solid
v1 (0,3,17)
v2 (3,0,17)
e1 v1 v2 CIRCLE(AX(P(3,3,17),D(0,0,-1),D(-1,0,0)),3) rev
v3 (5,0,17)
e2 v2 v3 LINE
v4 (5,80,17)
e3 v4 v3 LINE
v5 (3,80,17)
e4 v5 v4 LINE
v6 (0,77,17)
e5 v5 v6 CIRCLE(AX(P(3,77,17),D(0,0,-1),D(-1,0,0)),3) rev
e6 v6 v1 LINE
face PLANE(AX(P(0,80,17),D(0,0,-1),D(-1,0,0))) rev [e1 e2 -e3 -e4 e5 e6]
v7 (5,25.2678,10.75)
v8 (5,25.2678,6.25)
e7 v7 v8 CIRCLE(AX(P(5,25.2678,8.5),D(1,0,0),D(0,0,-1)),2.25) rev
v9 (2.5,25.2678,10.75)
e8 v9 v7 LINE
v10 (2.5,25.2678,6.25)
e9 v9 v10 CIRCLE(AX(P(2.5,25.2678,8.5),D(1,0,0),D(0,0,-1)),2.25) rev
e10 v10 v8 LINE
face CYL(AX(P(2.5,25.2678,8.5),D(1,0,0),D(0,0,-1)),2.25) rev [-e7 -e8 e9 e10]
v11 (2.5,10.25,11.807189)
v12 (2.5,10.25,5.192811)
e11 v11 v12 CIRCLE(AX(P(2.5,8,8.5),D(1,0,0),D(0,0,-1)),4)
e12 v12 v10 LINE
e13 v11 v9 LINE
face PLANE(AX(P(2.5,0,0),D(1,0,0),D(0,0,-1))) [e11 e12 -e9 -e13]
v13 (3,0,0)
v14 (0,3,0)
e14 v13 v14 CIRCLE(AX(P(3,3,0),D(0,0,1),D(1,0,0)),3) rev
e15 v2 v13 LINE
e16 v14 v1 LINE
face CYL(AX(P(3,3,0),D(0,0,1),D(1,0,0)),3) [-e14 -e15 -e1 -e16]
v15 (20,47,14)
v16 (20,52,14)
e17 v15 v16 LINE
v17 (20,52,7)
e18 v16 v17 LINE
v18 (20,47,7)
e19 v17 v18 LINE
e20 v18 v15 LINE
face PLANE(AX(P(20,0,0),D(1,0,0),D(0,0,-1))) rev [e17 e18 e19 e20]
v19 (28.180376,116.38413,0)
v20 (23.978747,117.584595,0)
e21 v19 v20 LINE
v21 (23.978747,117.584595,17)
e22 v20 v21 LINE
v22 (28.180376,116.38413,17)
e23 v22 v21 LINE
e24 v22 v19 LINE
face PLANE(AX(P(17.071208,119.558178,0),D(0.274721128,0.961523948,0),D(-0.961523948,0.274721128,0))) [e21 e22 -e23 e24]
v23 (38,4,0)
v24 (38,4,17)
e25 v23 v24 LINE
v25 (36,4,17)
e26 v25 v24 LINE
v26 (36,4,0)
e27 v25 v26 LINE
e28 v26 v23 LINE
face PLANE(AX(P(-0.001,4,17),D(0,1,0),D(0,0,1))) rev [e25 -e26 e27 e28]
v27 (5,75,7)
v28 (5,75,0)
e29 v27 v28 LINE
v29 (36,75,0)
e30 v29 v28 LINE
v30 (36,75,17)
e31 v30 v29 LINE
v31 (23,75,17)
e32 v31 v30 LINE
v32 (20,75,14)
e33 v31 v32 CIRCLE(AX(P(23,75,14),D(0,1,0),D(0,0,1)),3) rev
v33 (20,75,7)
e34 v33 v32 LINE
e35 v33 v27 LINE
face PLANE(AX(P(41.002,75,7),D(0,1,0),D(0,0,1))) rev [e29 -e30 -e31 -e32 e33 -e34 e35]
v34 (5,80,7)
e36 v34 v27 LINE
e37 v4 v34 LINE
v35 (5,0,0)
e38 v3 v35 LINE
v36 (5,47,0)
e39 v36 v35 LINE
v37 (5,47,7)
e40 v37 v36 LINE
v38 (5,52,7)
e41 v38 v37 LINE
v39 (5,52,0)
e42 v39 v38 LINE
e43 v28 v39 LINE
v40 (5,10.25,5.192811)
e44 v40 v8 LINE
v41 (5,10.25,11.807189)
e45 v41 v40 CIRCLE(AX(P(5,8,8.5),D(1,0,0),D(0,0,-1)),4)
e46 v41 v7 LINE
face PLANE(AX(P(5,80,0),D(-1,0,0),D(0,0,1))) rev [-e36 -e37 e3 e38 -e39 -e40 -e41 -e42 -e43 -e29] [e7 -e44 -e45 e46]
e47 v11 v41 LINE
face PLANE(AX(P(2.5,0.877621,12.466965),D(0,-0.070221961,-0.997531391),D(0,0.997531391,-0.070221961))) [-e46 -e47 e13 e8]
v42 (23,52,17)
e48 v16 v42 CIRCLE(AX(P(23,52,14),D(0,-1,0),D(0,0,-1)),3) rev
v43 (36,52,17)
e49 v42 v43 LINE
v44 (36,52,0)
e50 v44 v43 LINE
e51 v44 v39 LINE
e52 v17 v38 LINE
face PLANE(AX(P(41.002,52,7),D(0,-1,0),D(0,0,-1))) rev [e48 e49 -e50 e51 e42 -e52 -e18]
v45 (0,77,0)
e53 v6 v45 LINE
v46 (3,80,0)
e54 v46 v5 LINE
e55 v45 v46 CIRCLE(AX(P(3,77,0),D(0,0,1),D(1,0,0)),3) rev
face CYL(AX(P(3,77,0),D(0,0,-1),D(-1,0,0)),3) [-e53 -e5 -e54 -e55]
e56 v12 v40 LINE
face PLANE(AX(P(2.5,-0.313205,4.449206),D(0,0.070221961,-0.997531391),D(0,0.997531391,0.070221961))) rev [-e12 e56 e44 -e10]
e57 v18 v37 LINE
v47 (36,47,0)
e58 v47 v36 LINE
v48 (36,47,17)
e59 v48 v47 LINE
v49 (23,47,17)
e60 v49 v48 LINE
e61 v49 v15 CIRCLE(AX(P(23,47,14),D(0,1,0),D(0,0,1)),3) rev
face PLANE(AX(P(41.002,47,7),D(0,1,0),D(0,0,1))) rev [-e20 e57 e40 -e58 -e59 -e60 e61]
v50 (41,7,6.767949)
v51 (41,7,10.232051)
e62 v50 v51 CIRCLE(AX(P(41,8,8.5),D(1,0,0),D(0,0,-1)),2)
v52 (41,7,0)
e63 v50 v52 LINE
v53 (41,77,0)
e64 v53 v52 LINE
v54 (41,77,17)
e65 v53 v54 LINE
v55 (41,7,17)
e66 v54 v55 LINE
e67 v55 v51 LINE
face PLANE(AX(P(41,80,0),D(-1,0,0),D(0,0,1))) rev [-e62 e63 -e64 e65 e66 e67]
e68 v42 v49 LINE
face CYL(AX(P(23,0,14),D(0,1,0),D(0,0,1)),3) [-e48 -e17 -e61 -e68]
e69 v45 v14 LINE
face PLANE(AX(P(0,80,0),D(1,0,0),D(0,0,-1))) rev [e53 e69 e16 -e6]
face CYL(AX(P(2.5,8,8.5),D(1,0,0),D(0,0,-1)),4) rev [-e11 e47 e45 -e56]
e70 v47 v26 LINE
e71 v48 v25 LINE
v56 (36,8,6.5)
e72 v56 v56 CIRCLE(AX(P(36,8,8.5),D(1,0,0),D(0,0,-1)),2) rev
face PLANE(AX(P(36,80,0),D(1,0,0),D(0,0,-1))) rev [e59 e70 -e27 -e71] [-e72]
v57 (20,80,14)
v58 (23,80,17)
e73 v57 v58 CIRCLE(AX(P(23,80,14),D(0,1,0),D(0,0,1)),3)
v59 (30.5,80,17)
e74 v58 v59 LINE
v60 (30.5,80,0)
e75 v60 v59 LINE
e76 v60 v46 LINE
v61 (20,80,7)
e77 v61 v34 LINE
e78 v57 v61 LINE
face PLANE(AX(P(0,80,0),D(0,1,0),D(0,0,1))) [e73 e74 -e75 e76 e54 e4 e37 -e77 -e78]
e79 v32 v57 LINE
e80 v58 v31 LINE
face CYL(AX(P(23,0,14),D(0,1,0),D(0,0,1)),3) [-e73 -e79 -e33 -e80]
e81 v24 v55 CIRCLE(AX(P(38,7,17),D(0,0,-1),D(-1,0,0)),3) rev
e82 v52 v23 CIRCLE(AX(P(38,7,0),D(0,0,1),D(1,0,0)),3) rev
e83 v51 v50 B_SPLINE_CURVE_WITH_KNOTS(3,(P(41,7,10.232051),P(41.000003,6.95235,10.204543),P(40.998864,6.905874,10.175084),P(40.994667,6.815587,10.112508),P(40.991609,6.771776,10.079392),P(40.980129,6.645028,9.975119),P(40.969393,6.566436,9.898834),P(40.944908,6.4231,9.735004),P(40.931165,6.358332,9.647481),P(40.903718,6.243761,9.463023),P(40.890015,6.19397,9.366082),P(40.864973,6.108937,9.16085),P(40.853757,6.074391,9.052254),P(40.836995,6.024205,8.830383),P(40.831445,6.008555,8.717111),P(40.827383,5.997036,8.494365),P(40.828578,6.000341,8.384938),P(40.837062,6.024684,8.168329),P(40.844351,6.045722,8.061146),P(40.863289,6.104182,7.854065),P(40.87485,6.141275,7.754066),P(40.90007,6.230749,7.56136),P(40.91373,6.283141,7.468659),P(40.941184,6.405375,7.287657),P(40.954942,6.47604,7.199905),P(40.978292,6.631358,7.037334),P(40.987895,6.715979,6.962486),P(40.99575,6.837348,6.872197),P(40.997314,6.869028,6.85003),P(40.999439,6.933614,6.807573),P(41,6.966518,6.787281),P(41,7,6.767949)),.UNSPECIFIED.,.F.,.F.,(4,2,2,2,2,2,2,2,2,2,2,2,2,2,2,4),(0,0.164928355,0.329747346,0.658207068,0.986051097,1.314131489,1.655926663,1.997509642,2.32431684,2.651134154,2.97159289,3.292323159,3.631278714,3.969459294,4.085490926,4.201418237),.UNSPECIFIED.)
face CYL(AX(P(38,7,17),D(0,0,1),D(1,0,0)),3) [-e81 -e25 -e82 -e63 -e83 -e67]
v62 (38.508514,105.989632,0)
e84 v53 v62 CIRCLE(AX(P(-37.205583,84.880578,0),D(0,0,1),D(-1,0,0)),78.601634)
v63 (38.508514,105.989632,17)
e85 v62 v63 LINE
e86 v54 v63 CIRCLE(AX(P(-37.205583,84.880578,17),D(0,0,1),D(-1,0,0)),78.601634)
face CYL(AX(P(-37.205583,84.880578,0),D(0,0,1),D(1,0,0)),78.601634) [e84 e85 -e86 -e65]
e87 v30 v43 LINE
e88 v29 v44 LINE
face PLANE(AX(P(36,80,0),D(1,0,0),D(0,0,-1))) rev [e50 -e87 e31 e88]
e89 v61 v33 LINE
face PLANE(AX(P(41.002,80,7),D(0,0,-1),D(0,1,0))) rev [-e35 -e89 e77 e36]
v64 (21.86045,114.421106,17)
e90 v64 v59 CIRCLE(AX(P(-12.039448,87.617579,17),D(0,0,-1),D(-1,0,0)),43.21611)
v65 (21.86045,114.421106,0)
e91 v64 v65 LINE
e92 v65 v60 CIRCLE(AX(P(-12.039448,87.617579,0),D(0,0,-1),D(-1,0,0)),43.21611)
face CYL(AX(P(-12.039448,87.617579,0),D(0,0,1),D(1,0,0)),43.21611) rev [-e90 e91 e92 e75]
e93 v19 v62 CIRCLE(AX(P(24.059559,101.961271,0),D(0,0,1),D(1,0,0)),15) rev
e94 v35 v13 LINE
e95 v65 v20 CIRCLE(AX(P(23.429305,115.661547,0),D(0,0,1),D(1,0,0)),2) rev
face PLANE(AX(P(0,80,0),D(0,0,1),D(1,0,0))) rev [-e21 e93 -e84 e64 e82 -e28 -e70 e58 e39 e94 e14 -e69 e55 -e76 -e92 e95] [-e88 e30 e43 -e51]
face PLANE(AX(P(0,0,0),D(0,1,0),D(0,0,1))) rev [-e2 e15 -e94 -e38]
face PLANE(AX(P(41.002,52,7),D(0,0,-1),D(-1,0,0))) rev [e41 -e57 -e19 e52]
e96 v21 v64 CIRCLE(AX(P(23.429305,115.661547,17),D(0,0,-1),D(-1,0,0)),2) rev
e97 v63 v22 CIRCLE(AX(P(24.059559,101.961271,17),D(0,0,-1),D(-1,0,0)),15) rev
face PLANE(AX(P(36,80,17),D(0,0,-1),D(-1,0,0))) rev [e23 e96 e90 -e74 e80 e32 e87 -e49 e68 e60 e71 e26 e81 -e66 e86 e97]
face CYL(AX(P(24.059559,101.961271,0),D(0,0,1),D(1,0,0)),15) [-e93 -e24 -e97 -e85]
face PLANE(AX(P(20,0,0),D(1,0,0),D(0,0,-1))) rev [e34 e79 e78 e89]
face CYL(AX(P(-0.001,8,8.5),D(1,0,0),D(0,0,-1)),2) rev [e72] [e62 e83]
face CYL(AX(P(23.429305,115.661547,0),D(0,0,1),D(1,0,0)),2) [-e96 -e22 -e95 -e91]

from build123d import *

# Parameters (mm, degrees)
SKETCH1_W             = 5
SKETCH1_H             = 17
BOSS_EXTRUDE1_DEPTH   = 80
BOSS_EXTRUDE1_2_DEPTH = 80
CUT_EXTRUDE1_DEPTH    = 2.5
SKETCH7_W             = 17
SKETCH7_H             = 4
CUT_EXTRUDE4_DEPTH    = 5
SKETCH8_R             = 2
CUT_EXTRUDE5_DEPTH    = 5
BOSS_EXTRUDE3_REACH   = 91.359
SKETCH9_W             = 7
SKETCH9_H             = 5
SKETCH10_W            = 10
SKETCH10_H            = 5
BOSS_EXTRUDE4_DEPTH   = 16
FILLET3_R             = 3
BOSS_EXTRUDE5_DEPTH   = 17
FILLET4_R             = 2
FILLET5_R             = 15


with BuildPart() as part:
    # Sketch1 → Boss-Extrude1 (new body)
    with BuildSketch(Plane(origin=(0, 0, 0), x_dir=(1, 0, 0), z_dir=(0, 1, 0))):
        with Locations((2.5, -8.5)):
            Rectangle(SKETCH1_W, SKETCH1_H)
    extrude(amount=BOSS_EXTRUDE1_DEPTH)

    # Sketch2 → Cut-Extrude1 (cut)
    with BuildSketch(Plane(origin=(5, 0, 0), x_dir=(0, 0, -1), z_dir=(1, 0, 0))):
        with BuildLine():
            Line((-10.75, 25.267799715), (-11.807189139, 10.25))
            ThreePointArc((-11.807189139, 10.25), (-8.5, 12), (-5.192810861, 10.25))
            Line((-5.192810861, 10.25), (-6.25, 25.267799715))
            ThreePointArc((-6.25, 25.267799715), (-8.5, 27.517799715), (-10.75, 25.267799715))
        make_face()
        with BuildLine():
            ThreePointArc((-5.192810861, 10.25), (-8.5, 12), (-11.807189139, 10.25))
            Line((-11.807189139, 10.25), (-11.807189139, 5.75))
            ThreePointArc((-11.807189139, 5.75), (-8.5, 4), (-5.192810861, 5.75))
            Line((-5.192810861, 5.75), (-5.192810861, 10.25))
        make_face()
        with BuildLine():
            Line((-11.807189139, 5.75), (-11.807189139, 10.25))
            ThreePointArc((-11.807189139, 10.25), (-12.5, 8), (-11.807189139, 5.75))
        make_face()
        with BuildLine():
            ThreePointArc((-4.5, 8), (-4.677124344, 9.177124344), (-5.192810861, 10.25))
            Line((-5.192810861, 10.25), (-5.192810861, 5.75))
            ThreePointArc((-5.192810861, 5.75), (-4.677124344, 6.822875656), (-4.5, 8))
        make_face()
    extrude(amount=-CUT_EXTRUDE1_DEPTH, mode=Mode.SUBTRACT)


with BuildPart() as body_2:
    # Sketch1 → Boss-Extrude1 2 (new body)
    with BuildSketch(Plane(origin=(0, 0, 0), x_dir=(1, 0, 0), z_dir=(0, 1, 0))):
        with Locations((38.5, -8.5)):
            Rectangle(SKETCH1_W, SKETCH1_H)
    extrude(amount=BOSS_EXTRUDE1_2_DEPTH)

    # Sketch7 → Cut-Extrude4 (cut)
    with BuildSketch(Plane(origin=(41, 0, 0), x_dir=(0, 0, -1), z_dir=(1, 0, 0))):
        with Locations((-8.5, 2)):
            Rectangle(SKETCH7_W, SKETCH7_H)
    extrude(amount=-CUT_EXTRUDE4_DEPTH, mode=Mode.SUBTRACT)

    # Sketch8 → Cut-Extrude5 (cut)
    with BuildSketch(Plane(origin=(41, 0, 0), x_dir=(0, 0, -1), z_dir=(1, 0, 0))):
        with Locations((-8.5, 8)):
            Circle(SKETCH8_R)
    extrude(amount=-CUT_EXTRUDE5_DEPTH, mode=Mode.SUBTRACT)

    # Sketch9 → Boss-Extrude3 (add, up to next)
    with BuildSketch(Plane(origin=(5, 0, 0), x_dir=(0, 0, -1), z_dir=(1, 0, 0)), mode=Mode.PRIVATE) as boss_extrude3_sk1:
        with Locations((-3.5, 77.5)):
            Rectangle(SKETCH9_W, SKETCH9_H)
    boss_extrude3_tool1 = extrude(boss_extrude3_sk1.sketch, amount=BOSS_EXTRUDE3_REACH, mode=Mode.PRIVATE) - body_2.part
    # Sketch9 → Boss-Extrude3 (add, up to next)
    with BuildSketch(Plane(origin=(5, 0, 0), x_dir=(0, 0, -1), z_dir=(1, 0, 0)), mode=Mode.PRIVATE) as boss_extrude3_sk2:
        with Locations((-3.5, 49.5)):
            Rectangle(SKETCH9_W, SKETCH9_H)
    boss_extrude3_tool2 = extrude(boss_extrude3_sk2.sketch, amount=BOSS_EXTRUDE3_REACH, mode=Mode.PRIVATE) - body_2.part

    add(part.part)  # Boss-Extrude3 merges part
    add(boss_extrude3_tool1.solids().sort_by_distance((5, 77.5, 3.5))[0])
    add(boss_extrude3_tool2.solids().sort_by_distance((5, 49.5, 3.5))[0])

    # Sketch10 → Boss-Extrude4 (add)
    with BuildSketch(Plane.ZY.offset(-36)):
        with Locations((12, 77.5)):
            Rectangle(SKETCH10_W, SKETCH10_H)
        with Locations((12, 49.5)):
            Rectangle(SKETCH10_W, SKETCH10_H)
    extrude(amount=BOSS_EXTRUDE4_DEPTH)

    # Fillet3
    # the kernel refuses this fillet: 3 mm, written as the material it takes off along each edge
    with BuildSketch(Plane(origin=(41, 80, -7.5), x_dir=(0, -1, 0), z_dir=(0, 0, 1)), Plane(origin=(41, 4, 24.5), x_dir=(0, 1, 0), z_dir=(0, 0, -1))) as fillet3_piece_1:
        with BuildLine():
            CenterArc((FILLET3_R, -FILLET3_R), FILLET3_R, 90, 90)
            Line((0, -FILLET3_R), (0, 0))
            Line((0, 0), (FILLET3_R, 0))
        make_face()
    extrude(amount=32, mode=Mode.SUBTRACT)
    with BuildSketch(Plane(origin=(0, 80, 24.5), x_dir=(1, 0, 0), z_dir=(0, 0, -1)), Plane(origin=(0, 0, 24.5), x_dir=(0, 1, 0), z_dir=(0, 0, -1))) as fillet3_piece_2:
        with BuildLine():
            CenterArc((FILLET3_R, FILLET3_R), FILLET3_R, 180, 90)
            Line((0, FILLET3_R), (0, 0))
            Line((0, 0), (FILLET3_R, 0))
        make_face()
    extrude(amount=32, mode=Mode.SUBTRACT)
    with BuildSketch(Plane(origin=(20, 67.5, 17), x_dir=(0, 0, -1), z_dir=(0, 1, 0))) as fillet3_piece_3:
        with BuildLine():
            CenterArc((FILLET3_R, -FILLET3_R), FILLET3_R, 90, 90)
            Line((0, -FILLET3_R), (0, 0))
            Line((0, 0), (FILLET3_R, 0))
        make_face()
    extrude(amount=20, mode=Mode.SUBTRACT)
    with BuildSketch(Plane(origin=(20, 39.5, 17), x_dir=(1, 0, 0), z_dir=(0, 1, 0))) as fillet3_piece_4:
        with BuildLine():
            CenterArc((FILLET3_R, FILLET3_R), FILLET3_R, 180, 90)
            Line((0, FILLET3_R), (0, 0))
            Line((0, 0), (FILLET3_R, 0))
        make_face()
    extrude(amount=20, mode=Mode.SUBTRACT)

    # Sketch12 → Boss-Extrude5 (add, through all)
    with BuildSketch(Plane.XY.offset(17)):
        with BuildLine():
            Line((17.07120829, 119.558177775), (35.709852909, 114.232850741))
            ThreePointArc((35.709852909, 114.232850741), (40.614477912, 95.937468732), (41, 77))
            Line((41, 77), (30.5, 80))
            ThreePointArc((30.5, 80), (28.882999649, 101.509498789), (17.07120829, 119.558177775))
        make_face()
    extrude(amount=-BOSS_EXTRUDE5_DEPTH)

    # Fillet4
    fillet4_edges = [body_2.edges().sort_by_distance(p)[0] for p in [
        (17.07120829, 119.558177775, 8.5),
    ]]
    fillet(fillet4_edges, radius=FILLET4_R)

    # Fillet5
    fillet5_edges = [body_2.edges().sort_by_distance(p)[0] for p in [
        (35.709852909, 114.232850741, 8.5),
    ]]
    fillet(fillet5_edges, radius=FILLET5_R)


solid = body_2.part
